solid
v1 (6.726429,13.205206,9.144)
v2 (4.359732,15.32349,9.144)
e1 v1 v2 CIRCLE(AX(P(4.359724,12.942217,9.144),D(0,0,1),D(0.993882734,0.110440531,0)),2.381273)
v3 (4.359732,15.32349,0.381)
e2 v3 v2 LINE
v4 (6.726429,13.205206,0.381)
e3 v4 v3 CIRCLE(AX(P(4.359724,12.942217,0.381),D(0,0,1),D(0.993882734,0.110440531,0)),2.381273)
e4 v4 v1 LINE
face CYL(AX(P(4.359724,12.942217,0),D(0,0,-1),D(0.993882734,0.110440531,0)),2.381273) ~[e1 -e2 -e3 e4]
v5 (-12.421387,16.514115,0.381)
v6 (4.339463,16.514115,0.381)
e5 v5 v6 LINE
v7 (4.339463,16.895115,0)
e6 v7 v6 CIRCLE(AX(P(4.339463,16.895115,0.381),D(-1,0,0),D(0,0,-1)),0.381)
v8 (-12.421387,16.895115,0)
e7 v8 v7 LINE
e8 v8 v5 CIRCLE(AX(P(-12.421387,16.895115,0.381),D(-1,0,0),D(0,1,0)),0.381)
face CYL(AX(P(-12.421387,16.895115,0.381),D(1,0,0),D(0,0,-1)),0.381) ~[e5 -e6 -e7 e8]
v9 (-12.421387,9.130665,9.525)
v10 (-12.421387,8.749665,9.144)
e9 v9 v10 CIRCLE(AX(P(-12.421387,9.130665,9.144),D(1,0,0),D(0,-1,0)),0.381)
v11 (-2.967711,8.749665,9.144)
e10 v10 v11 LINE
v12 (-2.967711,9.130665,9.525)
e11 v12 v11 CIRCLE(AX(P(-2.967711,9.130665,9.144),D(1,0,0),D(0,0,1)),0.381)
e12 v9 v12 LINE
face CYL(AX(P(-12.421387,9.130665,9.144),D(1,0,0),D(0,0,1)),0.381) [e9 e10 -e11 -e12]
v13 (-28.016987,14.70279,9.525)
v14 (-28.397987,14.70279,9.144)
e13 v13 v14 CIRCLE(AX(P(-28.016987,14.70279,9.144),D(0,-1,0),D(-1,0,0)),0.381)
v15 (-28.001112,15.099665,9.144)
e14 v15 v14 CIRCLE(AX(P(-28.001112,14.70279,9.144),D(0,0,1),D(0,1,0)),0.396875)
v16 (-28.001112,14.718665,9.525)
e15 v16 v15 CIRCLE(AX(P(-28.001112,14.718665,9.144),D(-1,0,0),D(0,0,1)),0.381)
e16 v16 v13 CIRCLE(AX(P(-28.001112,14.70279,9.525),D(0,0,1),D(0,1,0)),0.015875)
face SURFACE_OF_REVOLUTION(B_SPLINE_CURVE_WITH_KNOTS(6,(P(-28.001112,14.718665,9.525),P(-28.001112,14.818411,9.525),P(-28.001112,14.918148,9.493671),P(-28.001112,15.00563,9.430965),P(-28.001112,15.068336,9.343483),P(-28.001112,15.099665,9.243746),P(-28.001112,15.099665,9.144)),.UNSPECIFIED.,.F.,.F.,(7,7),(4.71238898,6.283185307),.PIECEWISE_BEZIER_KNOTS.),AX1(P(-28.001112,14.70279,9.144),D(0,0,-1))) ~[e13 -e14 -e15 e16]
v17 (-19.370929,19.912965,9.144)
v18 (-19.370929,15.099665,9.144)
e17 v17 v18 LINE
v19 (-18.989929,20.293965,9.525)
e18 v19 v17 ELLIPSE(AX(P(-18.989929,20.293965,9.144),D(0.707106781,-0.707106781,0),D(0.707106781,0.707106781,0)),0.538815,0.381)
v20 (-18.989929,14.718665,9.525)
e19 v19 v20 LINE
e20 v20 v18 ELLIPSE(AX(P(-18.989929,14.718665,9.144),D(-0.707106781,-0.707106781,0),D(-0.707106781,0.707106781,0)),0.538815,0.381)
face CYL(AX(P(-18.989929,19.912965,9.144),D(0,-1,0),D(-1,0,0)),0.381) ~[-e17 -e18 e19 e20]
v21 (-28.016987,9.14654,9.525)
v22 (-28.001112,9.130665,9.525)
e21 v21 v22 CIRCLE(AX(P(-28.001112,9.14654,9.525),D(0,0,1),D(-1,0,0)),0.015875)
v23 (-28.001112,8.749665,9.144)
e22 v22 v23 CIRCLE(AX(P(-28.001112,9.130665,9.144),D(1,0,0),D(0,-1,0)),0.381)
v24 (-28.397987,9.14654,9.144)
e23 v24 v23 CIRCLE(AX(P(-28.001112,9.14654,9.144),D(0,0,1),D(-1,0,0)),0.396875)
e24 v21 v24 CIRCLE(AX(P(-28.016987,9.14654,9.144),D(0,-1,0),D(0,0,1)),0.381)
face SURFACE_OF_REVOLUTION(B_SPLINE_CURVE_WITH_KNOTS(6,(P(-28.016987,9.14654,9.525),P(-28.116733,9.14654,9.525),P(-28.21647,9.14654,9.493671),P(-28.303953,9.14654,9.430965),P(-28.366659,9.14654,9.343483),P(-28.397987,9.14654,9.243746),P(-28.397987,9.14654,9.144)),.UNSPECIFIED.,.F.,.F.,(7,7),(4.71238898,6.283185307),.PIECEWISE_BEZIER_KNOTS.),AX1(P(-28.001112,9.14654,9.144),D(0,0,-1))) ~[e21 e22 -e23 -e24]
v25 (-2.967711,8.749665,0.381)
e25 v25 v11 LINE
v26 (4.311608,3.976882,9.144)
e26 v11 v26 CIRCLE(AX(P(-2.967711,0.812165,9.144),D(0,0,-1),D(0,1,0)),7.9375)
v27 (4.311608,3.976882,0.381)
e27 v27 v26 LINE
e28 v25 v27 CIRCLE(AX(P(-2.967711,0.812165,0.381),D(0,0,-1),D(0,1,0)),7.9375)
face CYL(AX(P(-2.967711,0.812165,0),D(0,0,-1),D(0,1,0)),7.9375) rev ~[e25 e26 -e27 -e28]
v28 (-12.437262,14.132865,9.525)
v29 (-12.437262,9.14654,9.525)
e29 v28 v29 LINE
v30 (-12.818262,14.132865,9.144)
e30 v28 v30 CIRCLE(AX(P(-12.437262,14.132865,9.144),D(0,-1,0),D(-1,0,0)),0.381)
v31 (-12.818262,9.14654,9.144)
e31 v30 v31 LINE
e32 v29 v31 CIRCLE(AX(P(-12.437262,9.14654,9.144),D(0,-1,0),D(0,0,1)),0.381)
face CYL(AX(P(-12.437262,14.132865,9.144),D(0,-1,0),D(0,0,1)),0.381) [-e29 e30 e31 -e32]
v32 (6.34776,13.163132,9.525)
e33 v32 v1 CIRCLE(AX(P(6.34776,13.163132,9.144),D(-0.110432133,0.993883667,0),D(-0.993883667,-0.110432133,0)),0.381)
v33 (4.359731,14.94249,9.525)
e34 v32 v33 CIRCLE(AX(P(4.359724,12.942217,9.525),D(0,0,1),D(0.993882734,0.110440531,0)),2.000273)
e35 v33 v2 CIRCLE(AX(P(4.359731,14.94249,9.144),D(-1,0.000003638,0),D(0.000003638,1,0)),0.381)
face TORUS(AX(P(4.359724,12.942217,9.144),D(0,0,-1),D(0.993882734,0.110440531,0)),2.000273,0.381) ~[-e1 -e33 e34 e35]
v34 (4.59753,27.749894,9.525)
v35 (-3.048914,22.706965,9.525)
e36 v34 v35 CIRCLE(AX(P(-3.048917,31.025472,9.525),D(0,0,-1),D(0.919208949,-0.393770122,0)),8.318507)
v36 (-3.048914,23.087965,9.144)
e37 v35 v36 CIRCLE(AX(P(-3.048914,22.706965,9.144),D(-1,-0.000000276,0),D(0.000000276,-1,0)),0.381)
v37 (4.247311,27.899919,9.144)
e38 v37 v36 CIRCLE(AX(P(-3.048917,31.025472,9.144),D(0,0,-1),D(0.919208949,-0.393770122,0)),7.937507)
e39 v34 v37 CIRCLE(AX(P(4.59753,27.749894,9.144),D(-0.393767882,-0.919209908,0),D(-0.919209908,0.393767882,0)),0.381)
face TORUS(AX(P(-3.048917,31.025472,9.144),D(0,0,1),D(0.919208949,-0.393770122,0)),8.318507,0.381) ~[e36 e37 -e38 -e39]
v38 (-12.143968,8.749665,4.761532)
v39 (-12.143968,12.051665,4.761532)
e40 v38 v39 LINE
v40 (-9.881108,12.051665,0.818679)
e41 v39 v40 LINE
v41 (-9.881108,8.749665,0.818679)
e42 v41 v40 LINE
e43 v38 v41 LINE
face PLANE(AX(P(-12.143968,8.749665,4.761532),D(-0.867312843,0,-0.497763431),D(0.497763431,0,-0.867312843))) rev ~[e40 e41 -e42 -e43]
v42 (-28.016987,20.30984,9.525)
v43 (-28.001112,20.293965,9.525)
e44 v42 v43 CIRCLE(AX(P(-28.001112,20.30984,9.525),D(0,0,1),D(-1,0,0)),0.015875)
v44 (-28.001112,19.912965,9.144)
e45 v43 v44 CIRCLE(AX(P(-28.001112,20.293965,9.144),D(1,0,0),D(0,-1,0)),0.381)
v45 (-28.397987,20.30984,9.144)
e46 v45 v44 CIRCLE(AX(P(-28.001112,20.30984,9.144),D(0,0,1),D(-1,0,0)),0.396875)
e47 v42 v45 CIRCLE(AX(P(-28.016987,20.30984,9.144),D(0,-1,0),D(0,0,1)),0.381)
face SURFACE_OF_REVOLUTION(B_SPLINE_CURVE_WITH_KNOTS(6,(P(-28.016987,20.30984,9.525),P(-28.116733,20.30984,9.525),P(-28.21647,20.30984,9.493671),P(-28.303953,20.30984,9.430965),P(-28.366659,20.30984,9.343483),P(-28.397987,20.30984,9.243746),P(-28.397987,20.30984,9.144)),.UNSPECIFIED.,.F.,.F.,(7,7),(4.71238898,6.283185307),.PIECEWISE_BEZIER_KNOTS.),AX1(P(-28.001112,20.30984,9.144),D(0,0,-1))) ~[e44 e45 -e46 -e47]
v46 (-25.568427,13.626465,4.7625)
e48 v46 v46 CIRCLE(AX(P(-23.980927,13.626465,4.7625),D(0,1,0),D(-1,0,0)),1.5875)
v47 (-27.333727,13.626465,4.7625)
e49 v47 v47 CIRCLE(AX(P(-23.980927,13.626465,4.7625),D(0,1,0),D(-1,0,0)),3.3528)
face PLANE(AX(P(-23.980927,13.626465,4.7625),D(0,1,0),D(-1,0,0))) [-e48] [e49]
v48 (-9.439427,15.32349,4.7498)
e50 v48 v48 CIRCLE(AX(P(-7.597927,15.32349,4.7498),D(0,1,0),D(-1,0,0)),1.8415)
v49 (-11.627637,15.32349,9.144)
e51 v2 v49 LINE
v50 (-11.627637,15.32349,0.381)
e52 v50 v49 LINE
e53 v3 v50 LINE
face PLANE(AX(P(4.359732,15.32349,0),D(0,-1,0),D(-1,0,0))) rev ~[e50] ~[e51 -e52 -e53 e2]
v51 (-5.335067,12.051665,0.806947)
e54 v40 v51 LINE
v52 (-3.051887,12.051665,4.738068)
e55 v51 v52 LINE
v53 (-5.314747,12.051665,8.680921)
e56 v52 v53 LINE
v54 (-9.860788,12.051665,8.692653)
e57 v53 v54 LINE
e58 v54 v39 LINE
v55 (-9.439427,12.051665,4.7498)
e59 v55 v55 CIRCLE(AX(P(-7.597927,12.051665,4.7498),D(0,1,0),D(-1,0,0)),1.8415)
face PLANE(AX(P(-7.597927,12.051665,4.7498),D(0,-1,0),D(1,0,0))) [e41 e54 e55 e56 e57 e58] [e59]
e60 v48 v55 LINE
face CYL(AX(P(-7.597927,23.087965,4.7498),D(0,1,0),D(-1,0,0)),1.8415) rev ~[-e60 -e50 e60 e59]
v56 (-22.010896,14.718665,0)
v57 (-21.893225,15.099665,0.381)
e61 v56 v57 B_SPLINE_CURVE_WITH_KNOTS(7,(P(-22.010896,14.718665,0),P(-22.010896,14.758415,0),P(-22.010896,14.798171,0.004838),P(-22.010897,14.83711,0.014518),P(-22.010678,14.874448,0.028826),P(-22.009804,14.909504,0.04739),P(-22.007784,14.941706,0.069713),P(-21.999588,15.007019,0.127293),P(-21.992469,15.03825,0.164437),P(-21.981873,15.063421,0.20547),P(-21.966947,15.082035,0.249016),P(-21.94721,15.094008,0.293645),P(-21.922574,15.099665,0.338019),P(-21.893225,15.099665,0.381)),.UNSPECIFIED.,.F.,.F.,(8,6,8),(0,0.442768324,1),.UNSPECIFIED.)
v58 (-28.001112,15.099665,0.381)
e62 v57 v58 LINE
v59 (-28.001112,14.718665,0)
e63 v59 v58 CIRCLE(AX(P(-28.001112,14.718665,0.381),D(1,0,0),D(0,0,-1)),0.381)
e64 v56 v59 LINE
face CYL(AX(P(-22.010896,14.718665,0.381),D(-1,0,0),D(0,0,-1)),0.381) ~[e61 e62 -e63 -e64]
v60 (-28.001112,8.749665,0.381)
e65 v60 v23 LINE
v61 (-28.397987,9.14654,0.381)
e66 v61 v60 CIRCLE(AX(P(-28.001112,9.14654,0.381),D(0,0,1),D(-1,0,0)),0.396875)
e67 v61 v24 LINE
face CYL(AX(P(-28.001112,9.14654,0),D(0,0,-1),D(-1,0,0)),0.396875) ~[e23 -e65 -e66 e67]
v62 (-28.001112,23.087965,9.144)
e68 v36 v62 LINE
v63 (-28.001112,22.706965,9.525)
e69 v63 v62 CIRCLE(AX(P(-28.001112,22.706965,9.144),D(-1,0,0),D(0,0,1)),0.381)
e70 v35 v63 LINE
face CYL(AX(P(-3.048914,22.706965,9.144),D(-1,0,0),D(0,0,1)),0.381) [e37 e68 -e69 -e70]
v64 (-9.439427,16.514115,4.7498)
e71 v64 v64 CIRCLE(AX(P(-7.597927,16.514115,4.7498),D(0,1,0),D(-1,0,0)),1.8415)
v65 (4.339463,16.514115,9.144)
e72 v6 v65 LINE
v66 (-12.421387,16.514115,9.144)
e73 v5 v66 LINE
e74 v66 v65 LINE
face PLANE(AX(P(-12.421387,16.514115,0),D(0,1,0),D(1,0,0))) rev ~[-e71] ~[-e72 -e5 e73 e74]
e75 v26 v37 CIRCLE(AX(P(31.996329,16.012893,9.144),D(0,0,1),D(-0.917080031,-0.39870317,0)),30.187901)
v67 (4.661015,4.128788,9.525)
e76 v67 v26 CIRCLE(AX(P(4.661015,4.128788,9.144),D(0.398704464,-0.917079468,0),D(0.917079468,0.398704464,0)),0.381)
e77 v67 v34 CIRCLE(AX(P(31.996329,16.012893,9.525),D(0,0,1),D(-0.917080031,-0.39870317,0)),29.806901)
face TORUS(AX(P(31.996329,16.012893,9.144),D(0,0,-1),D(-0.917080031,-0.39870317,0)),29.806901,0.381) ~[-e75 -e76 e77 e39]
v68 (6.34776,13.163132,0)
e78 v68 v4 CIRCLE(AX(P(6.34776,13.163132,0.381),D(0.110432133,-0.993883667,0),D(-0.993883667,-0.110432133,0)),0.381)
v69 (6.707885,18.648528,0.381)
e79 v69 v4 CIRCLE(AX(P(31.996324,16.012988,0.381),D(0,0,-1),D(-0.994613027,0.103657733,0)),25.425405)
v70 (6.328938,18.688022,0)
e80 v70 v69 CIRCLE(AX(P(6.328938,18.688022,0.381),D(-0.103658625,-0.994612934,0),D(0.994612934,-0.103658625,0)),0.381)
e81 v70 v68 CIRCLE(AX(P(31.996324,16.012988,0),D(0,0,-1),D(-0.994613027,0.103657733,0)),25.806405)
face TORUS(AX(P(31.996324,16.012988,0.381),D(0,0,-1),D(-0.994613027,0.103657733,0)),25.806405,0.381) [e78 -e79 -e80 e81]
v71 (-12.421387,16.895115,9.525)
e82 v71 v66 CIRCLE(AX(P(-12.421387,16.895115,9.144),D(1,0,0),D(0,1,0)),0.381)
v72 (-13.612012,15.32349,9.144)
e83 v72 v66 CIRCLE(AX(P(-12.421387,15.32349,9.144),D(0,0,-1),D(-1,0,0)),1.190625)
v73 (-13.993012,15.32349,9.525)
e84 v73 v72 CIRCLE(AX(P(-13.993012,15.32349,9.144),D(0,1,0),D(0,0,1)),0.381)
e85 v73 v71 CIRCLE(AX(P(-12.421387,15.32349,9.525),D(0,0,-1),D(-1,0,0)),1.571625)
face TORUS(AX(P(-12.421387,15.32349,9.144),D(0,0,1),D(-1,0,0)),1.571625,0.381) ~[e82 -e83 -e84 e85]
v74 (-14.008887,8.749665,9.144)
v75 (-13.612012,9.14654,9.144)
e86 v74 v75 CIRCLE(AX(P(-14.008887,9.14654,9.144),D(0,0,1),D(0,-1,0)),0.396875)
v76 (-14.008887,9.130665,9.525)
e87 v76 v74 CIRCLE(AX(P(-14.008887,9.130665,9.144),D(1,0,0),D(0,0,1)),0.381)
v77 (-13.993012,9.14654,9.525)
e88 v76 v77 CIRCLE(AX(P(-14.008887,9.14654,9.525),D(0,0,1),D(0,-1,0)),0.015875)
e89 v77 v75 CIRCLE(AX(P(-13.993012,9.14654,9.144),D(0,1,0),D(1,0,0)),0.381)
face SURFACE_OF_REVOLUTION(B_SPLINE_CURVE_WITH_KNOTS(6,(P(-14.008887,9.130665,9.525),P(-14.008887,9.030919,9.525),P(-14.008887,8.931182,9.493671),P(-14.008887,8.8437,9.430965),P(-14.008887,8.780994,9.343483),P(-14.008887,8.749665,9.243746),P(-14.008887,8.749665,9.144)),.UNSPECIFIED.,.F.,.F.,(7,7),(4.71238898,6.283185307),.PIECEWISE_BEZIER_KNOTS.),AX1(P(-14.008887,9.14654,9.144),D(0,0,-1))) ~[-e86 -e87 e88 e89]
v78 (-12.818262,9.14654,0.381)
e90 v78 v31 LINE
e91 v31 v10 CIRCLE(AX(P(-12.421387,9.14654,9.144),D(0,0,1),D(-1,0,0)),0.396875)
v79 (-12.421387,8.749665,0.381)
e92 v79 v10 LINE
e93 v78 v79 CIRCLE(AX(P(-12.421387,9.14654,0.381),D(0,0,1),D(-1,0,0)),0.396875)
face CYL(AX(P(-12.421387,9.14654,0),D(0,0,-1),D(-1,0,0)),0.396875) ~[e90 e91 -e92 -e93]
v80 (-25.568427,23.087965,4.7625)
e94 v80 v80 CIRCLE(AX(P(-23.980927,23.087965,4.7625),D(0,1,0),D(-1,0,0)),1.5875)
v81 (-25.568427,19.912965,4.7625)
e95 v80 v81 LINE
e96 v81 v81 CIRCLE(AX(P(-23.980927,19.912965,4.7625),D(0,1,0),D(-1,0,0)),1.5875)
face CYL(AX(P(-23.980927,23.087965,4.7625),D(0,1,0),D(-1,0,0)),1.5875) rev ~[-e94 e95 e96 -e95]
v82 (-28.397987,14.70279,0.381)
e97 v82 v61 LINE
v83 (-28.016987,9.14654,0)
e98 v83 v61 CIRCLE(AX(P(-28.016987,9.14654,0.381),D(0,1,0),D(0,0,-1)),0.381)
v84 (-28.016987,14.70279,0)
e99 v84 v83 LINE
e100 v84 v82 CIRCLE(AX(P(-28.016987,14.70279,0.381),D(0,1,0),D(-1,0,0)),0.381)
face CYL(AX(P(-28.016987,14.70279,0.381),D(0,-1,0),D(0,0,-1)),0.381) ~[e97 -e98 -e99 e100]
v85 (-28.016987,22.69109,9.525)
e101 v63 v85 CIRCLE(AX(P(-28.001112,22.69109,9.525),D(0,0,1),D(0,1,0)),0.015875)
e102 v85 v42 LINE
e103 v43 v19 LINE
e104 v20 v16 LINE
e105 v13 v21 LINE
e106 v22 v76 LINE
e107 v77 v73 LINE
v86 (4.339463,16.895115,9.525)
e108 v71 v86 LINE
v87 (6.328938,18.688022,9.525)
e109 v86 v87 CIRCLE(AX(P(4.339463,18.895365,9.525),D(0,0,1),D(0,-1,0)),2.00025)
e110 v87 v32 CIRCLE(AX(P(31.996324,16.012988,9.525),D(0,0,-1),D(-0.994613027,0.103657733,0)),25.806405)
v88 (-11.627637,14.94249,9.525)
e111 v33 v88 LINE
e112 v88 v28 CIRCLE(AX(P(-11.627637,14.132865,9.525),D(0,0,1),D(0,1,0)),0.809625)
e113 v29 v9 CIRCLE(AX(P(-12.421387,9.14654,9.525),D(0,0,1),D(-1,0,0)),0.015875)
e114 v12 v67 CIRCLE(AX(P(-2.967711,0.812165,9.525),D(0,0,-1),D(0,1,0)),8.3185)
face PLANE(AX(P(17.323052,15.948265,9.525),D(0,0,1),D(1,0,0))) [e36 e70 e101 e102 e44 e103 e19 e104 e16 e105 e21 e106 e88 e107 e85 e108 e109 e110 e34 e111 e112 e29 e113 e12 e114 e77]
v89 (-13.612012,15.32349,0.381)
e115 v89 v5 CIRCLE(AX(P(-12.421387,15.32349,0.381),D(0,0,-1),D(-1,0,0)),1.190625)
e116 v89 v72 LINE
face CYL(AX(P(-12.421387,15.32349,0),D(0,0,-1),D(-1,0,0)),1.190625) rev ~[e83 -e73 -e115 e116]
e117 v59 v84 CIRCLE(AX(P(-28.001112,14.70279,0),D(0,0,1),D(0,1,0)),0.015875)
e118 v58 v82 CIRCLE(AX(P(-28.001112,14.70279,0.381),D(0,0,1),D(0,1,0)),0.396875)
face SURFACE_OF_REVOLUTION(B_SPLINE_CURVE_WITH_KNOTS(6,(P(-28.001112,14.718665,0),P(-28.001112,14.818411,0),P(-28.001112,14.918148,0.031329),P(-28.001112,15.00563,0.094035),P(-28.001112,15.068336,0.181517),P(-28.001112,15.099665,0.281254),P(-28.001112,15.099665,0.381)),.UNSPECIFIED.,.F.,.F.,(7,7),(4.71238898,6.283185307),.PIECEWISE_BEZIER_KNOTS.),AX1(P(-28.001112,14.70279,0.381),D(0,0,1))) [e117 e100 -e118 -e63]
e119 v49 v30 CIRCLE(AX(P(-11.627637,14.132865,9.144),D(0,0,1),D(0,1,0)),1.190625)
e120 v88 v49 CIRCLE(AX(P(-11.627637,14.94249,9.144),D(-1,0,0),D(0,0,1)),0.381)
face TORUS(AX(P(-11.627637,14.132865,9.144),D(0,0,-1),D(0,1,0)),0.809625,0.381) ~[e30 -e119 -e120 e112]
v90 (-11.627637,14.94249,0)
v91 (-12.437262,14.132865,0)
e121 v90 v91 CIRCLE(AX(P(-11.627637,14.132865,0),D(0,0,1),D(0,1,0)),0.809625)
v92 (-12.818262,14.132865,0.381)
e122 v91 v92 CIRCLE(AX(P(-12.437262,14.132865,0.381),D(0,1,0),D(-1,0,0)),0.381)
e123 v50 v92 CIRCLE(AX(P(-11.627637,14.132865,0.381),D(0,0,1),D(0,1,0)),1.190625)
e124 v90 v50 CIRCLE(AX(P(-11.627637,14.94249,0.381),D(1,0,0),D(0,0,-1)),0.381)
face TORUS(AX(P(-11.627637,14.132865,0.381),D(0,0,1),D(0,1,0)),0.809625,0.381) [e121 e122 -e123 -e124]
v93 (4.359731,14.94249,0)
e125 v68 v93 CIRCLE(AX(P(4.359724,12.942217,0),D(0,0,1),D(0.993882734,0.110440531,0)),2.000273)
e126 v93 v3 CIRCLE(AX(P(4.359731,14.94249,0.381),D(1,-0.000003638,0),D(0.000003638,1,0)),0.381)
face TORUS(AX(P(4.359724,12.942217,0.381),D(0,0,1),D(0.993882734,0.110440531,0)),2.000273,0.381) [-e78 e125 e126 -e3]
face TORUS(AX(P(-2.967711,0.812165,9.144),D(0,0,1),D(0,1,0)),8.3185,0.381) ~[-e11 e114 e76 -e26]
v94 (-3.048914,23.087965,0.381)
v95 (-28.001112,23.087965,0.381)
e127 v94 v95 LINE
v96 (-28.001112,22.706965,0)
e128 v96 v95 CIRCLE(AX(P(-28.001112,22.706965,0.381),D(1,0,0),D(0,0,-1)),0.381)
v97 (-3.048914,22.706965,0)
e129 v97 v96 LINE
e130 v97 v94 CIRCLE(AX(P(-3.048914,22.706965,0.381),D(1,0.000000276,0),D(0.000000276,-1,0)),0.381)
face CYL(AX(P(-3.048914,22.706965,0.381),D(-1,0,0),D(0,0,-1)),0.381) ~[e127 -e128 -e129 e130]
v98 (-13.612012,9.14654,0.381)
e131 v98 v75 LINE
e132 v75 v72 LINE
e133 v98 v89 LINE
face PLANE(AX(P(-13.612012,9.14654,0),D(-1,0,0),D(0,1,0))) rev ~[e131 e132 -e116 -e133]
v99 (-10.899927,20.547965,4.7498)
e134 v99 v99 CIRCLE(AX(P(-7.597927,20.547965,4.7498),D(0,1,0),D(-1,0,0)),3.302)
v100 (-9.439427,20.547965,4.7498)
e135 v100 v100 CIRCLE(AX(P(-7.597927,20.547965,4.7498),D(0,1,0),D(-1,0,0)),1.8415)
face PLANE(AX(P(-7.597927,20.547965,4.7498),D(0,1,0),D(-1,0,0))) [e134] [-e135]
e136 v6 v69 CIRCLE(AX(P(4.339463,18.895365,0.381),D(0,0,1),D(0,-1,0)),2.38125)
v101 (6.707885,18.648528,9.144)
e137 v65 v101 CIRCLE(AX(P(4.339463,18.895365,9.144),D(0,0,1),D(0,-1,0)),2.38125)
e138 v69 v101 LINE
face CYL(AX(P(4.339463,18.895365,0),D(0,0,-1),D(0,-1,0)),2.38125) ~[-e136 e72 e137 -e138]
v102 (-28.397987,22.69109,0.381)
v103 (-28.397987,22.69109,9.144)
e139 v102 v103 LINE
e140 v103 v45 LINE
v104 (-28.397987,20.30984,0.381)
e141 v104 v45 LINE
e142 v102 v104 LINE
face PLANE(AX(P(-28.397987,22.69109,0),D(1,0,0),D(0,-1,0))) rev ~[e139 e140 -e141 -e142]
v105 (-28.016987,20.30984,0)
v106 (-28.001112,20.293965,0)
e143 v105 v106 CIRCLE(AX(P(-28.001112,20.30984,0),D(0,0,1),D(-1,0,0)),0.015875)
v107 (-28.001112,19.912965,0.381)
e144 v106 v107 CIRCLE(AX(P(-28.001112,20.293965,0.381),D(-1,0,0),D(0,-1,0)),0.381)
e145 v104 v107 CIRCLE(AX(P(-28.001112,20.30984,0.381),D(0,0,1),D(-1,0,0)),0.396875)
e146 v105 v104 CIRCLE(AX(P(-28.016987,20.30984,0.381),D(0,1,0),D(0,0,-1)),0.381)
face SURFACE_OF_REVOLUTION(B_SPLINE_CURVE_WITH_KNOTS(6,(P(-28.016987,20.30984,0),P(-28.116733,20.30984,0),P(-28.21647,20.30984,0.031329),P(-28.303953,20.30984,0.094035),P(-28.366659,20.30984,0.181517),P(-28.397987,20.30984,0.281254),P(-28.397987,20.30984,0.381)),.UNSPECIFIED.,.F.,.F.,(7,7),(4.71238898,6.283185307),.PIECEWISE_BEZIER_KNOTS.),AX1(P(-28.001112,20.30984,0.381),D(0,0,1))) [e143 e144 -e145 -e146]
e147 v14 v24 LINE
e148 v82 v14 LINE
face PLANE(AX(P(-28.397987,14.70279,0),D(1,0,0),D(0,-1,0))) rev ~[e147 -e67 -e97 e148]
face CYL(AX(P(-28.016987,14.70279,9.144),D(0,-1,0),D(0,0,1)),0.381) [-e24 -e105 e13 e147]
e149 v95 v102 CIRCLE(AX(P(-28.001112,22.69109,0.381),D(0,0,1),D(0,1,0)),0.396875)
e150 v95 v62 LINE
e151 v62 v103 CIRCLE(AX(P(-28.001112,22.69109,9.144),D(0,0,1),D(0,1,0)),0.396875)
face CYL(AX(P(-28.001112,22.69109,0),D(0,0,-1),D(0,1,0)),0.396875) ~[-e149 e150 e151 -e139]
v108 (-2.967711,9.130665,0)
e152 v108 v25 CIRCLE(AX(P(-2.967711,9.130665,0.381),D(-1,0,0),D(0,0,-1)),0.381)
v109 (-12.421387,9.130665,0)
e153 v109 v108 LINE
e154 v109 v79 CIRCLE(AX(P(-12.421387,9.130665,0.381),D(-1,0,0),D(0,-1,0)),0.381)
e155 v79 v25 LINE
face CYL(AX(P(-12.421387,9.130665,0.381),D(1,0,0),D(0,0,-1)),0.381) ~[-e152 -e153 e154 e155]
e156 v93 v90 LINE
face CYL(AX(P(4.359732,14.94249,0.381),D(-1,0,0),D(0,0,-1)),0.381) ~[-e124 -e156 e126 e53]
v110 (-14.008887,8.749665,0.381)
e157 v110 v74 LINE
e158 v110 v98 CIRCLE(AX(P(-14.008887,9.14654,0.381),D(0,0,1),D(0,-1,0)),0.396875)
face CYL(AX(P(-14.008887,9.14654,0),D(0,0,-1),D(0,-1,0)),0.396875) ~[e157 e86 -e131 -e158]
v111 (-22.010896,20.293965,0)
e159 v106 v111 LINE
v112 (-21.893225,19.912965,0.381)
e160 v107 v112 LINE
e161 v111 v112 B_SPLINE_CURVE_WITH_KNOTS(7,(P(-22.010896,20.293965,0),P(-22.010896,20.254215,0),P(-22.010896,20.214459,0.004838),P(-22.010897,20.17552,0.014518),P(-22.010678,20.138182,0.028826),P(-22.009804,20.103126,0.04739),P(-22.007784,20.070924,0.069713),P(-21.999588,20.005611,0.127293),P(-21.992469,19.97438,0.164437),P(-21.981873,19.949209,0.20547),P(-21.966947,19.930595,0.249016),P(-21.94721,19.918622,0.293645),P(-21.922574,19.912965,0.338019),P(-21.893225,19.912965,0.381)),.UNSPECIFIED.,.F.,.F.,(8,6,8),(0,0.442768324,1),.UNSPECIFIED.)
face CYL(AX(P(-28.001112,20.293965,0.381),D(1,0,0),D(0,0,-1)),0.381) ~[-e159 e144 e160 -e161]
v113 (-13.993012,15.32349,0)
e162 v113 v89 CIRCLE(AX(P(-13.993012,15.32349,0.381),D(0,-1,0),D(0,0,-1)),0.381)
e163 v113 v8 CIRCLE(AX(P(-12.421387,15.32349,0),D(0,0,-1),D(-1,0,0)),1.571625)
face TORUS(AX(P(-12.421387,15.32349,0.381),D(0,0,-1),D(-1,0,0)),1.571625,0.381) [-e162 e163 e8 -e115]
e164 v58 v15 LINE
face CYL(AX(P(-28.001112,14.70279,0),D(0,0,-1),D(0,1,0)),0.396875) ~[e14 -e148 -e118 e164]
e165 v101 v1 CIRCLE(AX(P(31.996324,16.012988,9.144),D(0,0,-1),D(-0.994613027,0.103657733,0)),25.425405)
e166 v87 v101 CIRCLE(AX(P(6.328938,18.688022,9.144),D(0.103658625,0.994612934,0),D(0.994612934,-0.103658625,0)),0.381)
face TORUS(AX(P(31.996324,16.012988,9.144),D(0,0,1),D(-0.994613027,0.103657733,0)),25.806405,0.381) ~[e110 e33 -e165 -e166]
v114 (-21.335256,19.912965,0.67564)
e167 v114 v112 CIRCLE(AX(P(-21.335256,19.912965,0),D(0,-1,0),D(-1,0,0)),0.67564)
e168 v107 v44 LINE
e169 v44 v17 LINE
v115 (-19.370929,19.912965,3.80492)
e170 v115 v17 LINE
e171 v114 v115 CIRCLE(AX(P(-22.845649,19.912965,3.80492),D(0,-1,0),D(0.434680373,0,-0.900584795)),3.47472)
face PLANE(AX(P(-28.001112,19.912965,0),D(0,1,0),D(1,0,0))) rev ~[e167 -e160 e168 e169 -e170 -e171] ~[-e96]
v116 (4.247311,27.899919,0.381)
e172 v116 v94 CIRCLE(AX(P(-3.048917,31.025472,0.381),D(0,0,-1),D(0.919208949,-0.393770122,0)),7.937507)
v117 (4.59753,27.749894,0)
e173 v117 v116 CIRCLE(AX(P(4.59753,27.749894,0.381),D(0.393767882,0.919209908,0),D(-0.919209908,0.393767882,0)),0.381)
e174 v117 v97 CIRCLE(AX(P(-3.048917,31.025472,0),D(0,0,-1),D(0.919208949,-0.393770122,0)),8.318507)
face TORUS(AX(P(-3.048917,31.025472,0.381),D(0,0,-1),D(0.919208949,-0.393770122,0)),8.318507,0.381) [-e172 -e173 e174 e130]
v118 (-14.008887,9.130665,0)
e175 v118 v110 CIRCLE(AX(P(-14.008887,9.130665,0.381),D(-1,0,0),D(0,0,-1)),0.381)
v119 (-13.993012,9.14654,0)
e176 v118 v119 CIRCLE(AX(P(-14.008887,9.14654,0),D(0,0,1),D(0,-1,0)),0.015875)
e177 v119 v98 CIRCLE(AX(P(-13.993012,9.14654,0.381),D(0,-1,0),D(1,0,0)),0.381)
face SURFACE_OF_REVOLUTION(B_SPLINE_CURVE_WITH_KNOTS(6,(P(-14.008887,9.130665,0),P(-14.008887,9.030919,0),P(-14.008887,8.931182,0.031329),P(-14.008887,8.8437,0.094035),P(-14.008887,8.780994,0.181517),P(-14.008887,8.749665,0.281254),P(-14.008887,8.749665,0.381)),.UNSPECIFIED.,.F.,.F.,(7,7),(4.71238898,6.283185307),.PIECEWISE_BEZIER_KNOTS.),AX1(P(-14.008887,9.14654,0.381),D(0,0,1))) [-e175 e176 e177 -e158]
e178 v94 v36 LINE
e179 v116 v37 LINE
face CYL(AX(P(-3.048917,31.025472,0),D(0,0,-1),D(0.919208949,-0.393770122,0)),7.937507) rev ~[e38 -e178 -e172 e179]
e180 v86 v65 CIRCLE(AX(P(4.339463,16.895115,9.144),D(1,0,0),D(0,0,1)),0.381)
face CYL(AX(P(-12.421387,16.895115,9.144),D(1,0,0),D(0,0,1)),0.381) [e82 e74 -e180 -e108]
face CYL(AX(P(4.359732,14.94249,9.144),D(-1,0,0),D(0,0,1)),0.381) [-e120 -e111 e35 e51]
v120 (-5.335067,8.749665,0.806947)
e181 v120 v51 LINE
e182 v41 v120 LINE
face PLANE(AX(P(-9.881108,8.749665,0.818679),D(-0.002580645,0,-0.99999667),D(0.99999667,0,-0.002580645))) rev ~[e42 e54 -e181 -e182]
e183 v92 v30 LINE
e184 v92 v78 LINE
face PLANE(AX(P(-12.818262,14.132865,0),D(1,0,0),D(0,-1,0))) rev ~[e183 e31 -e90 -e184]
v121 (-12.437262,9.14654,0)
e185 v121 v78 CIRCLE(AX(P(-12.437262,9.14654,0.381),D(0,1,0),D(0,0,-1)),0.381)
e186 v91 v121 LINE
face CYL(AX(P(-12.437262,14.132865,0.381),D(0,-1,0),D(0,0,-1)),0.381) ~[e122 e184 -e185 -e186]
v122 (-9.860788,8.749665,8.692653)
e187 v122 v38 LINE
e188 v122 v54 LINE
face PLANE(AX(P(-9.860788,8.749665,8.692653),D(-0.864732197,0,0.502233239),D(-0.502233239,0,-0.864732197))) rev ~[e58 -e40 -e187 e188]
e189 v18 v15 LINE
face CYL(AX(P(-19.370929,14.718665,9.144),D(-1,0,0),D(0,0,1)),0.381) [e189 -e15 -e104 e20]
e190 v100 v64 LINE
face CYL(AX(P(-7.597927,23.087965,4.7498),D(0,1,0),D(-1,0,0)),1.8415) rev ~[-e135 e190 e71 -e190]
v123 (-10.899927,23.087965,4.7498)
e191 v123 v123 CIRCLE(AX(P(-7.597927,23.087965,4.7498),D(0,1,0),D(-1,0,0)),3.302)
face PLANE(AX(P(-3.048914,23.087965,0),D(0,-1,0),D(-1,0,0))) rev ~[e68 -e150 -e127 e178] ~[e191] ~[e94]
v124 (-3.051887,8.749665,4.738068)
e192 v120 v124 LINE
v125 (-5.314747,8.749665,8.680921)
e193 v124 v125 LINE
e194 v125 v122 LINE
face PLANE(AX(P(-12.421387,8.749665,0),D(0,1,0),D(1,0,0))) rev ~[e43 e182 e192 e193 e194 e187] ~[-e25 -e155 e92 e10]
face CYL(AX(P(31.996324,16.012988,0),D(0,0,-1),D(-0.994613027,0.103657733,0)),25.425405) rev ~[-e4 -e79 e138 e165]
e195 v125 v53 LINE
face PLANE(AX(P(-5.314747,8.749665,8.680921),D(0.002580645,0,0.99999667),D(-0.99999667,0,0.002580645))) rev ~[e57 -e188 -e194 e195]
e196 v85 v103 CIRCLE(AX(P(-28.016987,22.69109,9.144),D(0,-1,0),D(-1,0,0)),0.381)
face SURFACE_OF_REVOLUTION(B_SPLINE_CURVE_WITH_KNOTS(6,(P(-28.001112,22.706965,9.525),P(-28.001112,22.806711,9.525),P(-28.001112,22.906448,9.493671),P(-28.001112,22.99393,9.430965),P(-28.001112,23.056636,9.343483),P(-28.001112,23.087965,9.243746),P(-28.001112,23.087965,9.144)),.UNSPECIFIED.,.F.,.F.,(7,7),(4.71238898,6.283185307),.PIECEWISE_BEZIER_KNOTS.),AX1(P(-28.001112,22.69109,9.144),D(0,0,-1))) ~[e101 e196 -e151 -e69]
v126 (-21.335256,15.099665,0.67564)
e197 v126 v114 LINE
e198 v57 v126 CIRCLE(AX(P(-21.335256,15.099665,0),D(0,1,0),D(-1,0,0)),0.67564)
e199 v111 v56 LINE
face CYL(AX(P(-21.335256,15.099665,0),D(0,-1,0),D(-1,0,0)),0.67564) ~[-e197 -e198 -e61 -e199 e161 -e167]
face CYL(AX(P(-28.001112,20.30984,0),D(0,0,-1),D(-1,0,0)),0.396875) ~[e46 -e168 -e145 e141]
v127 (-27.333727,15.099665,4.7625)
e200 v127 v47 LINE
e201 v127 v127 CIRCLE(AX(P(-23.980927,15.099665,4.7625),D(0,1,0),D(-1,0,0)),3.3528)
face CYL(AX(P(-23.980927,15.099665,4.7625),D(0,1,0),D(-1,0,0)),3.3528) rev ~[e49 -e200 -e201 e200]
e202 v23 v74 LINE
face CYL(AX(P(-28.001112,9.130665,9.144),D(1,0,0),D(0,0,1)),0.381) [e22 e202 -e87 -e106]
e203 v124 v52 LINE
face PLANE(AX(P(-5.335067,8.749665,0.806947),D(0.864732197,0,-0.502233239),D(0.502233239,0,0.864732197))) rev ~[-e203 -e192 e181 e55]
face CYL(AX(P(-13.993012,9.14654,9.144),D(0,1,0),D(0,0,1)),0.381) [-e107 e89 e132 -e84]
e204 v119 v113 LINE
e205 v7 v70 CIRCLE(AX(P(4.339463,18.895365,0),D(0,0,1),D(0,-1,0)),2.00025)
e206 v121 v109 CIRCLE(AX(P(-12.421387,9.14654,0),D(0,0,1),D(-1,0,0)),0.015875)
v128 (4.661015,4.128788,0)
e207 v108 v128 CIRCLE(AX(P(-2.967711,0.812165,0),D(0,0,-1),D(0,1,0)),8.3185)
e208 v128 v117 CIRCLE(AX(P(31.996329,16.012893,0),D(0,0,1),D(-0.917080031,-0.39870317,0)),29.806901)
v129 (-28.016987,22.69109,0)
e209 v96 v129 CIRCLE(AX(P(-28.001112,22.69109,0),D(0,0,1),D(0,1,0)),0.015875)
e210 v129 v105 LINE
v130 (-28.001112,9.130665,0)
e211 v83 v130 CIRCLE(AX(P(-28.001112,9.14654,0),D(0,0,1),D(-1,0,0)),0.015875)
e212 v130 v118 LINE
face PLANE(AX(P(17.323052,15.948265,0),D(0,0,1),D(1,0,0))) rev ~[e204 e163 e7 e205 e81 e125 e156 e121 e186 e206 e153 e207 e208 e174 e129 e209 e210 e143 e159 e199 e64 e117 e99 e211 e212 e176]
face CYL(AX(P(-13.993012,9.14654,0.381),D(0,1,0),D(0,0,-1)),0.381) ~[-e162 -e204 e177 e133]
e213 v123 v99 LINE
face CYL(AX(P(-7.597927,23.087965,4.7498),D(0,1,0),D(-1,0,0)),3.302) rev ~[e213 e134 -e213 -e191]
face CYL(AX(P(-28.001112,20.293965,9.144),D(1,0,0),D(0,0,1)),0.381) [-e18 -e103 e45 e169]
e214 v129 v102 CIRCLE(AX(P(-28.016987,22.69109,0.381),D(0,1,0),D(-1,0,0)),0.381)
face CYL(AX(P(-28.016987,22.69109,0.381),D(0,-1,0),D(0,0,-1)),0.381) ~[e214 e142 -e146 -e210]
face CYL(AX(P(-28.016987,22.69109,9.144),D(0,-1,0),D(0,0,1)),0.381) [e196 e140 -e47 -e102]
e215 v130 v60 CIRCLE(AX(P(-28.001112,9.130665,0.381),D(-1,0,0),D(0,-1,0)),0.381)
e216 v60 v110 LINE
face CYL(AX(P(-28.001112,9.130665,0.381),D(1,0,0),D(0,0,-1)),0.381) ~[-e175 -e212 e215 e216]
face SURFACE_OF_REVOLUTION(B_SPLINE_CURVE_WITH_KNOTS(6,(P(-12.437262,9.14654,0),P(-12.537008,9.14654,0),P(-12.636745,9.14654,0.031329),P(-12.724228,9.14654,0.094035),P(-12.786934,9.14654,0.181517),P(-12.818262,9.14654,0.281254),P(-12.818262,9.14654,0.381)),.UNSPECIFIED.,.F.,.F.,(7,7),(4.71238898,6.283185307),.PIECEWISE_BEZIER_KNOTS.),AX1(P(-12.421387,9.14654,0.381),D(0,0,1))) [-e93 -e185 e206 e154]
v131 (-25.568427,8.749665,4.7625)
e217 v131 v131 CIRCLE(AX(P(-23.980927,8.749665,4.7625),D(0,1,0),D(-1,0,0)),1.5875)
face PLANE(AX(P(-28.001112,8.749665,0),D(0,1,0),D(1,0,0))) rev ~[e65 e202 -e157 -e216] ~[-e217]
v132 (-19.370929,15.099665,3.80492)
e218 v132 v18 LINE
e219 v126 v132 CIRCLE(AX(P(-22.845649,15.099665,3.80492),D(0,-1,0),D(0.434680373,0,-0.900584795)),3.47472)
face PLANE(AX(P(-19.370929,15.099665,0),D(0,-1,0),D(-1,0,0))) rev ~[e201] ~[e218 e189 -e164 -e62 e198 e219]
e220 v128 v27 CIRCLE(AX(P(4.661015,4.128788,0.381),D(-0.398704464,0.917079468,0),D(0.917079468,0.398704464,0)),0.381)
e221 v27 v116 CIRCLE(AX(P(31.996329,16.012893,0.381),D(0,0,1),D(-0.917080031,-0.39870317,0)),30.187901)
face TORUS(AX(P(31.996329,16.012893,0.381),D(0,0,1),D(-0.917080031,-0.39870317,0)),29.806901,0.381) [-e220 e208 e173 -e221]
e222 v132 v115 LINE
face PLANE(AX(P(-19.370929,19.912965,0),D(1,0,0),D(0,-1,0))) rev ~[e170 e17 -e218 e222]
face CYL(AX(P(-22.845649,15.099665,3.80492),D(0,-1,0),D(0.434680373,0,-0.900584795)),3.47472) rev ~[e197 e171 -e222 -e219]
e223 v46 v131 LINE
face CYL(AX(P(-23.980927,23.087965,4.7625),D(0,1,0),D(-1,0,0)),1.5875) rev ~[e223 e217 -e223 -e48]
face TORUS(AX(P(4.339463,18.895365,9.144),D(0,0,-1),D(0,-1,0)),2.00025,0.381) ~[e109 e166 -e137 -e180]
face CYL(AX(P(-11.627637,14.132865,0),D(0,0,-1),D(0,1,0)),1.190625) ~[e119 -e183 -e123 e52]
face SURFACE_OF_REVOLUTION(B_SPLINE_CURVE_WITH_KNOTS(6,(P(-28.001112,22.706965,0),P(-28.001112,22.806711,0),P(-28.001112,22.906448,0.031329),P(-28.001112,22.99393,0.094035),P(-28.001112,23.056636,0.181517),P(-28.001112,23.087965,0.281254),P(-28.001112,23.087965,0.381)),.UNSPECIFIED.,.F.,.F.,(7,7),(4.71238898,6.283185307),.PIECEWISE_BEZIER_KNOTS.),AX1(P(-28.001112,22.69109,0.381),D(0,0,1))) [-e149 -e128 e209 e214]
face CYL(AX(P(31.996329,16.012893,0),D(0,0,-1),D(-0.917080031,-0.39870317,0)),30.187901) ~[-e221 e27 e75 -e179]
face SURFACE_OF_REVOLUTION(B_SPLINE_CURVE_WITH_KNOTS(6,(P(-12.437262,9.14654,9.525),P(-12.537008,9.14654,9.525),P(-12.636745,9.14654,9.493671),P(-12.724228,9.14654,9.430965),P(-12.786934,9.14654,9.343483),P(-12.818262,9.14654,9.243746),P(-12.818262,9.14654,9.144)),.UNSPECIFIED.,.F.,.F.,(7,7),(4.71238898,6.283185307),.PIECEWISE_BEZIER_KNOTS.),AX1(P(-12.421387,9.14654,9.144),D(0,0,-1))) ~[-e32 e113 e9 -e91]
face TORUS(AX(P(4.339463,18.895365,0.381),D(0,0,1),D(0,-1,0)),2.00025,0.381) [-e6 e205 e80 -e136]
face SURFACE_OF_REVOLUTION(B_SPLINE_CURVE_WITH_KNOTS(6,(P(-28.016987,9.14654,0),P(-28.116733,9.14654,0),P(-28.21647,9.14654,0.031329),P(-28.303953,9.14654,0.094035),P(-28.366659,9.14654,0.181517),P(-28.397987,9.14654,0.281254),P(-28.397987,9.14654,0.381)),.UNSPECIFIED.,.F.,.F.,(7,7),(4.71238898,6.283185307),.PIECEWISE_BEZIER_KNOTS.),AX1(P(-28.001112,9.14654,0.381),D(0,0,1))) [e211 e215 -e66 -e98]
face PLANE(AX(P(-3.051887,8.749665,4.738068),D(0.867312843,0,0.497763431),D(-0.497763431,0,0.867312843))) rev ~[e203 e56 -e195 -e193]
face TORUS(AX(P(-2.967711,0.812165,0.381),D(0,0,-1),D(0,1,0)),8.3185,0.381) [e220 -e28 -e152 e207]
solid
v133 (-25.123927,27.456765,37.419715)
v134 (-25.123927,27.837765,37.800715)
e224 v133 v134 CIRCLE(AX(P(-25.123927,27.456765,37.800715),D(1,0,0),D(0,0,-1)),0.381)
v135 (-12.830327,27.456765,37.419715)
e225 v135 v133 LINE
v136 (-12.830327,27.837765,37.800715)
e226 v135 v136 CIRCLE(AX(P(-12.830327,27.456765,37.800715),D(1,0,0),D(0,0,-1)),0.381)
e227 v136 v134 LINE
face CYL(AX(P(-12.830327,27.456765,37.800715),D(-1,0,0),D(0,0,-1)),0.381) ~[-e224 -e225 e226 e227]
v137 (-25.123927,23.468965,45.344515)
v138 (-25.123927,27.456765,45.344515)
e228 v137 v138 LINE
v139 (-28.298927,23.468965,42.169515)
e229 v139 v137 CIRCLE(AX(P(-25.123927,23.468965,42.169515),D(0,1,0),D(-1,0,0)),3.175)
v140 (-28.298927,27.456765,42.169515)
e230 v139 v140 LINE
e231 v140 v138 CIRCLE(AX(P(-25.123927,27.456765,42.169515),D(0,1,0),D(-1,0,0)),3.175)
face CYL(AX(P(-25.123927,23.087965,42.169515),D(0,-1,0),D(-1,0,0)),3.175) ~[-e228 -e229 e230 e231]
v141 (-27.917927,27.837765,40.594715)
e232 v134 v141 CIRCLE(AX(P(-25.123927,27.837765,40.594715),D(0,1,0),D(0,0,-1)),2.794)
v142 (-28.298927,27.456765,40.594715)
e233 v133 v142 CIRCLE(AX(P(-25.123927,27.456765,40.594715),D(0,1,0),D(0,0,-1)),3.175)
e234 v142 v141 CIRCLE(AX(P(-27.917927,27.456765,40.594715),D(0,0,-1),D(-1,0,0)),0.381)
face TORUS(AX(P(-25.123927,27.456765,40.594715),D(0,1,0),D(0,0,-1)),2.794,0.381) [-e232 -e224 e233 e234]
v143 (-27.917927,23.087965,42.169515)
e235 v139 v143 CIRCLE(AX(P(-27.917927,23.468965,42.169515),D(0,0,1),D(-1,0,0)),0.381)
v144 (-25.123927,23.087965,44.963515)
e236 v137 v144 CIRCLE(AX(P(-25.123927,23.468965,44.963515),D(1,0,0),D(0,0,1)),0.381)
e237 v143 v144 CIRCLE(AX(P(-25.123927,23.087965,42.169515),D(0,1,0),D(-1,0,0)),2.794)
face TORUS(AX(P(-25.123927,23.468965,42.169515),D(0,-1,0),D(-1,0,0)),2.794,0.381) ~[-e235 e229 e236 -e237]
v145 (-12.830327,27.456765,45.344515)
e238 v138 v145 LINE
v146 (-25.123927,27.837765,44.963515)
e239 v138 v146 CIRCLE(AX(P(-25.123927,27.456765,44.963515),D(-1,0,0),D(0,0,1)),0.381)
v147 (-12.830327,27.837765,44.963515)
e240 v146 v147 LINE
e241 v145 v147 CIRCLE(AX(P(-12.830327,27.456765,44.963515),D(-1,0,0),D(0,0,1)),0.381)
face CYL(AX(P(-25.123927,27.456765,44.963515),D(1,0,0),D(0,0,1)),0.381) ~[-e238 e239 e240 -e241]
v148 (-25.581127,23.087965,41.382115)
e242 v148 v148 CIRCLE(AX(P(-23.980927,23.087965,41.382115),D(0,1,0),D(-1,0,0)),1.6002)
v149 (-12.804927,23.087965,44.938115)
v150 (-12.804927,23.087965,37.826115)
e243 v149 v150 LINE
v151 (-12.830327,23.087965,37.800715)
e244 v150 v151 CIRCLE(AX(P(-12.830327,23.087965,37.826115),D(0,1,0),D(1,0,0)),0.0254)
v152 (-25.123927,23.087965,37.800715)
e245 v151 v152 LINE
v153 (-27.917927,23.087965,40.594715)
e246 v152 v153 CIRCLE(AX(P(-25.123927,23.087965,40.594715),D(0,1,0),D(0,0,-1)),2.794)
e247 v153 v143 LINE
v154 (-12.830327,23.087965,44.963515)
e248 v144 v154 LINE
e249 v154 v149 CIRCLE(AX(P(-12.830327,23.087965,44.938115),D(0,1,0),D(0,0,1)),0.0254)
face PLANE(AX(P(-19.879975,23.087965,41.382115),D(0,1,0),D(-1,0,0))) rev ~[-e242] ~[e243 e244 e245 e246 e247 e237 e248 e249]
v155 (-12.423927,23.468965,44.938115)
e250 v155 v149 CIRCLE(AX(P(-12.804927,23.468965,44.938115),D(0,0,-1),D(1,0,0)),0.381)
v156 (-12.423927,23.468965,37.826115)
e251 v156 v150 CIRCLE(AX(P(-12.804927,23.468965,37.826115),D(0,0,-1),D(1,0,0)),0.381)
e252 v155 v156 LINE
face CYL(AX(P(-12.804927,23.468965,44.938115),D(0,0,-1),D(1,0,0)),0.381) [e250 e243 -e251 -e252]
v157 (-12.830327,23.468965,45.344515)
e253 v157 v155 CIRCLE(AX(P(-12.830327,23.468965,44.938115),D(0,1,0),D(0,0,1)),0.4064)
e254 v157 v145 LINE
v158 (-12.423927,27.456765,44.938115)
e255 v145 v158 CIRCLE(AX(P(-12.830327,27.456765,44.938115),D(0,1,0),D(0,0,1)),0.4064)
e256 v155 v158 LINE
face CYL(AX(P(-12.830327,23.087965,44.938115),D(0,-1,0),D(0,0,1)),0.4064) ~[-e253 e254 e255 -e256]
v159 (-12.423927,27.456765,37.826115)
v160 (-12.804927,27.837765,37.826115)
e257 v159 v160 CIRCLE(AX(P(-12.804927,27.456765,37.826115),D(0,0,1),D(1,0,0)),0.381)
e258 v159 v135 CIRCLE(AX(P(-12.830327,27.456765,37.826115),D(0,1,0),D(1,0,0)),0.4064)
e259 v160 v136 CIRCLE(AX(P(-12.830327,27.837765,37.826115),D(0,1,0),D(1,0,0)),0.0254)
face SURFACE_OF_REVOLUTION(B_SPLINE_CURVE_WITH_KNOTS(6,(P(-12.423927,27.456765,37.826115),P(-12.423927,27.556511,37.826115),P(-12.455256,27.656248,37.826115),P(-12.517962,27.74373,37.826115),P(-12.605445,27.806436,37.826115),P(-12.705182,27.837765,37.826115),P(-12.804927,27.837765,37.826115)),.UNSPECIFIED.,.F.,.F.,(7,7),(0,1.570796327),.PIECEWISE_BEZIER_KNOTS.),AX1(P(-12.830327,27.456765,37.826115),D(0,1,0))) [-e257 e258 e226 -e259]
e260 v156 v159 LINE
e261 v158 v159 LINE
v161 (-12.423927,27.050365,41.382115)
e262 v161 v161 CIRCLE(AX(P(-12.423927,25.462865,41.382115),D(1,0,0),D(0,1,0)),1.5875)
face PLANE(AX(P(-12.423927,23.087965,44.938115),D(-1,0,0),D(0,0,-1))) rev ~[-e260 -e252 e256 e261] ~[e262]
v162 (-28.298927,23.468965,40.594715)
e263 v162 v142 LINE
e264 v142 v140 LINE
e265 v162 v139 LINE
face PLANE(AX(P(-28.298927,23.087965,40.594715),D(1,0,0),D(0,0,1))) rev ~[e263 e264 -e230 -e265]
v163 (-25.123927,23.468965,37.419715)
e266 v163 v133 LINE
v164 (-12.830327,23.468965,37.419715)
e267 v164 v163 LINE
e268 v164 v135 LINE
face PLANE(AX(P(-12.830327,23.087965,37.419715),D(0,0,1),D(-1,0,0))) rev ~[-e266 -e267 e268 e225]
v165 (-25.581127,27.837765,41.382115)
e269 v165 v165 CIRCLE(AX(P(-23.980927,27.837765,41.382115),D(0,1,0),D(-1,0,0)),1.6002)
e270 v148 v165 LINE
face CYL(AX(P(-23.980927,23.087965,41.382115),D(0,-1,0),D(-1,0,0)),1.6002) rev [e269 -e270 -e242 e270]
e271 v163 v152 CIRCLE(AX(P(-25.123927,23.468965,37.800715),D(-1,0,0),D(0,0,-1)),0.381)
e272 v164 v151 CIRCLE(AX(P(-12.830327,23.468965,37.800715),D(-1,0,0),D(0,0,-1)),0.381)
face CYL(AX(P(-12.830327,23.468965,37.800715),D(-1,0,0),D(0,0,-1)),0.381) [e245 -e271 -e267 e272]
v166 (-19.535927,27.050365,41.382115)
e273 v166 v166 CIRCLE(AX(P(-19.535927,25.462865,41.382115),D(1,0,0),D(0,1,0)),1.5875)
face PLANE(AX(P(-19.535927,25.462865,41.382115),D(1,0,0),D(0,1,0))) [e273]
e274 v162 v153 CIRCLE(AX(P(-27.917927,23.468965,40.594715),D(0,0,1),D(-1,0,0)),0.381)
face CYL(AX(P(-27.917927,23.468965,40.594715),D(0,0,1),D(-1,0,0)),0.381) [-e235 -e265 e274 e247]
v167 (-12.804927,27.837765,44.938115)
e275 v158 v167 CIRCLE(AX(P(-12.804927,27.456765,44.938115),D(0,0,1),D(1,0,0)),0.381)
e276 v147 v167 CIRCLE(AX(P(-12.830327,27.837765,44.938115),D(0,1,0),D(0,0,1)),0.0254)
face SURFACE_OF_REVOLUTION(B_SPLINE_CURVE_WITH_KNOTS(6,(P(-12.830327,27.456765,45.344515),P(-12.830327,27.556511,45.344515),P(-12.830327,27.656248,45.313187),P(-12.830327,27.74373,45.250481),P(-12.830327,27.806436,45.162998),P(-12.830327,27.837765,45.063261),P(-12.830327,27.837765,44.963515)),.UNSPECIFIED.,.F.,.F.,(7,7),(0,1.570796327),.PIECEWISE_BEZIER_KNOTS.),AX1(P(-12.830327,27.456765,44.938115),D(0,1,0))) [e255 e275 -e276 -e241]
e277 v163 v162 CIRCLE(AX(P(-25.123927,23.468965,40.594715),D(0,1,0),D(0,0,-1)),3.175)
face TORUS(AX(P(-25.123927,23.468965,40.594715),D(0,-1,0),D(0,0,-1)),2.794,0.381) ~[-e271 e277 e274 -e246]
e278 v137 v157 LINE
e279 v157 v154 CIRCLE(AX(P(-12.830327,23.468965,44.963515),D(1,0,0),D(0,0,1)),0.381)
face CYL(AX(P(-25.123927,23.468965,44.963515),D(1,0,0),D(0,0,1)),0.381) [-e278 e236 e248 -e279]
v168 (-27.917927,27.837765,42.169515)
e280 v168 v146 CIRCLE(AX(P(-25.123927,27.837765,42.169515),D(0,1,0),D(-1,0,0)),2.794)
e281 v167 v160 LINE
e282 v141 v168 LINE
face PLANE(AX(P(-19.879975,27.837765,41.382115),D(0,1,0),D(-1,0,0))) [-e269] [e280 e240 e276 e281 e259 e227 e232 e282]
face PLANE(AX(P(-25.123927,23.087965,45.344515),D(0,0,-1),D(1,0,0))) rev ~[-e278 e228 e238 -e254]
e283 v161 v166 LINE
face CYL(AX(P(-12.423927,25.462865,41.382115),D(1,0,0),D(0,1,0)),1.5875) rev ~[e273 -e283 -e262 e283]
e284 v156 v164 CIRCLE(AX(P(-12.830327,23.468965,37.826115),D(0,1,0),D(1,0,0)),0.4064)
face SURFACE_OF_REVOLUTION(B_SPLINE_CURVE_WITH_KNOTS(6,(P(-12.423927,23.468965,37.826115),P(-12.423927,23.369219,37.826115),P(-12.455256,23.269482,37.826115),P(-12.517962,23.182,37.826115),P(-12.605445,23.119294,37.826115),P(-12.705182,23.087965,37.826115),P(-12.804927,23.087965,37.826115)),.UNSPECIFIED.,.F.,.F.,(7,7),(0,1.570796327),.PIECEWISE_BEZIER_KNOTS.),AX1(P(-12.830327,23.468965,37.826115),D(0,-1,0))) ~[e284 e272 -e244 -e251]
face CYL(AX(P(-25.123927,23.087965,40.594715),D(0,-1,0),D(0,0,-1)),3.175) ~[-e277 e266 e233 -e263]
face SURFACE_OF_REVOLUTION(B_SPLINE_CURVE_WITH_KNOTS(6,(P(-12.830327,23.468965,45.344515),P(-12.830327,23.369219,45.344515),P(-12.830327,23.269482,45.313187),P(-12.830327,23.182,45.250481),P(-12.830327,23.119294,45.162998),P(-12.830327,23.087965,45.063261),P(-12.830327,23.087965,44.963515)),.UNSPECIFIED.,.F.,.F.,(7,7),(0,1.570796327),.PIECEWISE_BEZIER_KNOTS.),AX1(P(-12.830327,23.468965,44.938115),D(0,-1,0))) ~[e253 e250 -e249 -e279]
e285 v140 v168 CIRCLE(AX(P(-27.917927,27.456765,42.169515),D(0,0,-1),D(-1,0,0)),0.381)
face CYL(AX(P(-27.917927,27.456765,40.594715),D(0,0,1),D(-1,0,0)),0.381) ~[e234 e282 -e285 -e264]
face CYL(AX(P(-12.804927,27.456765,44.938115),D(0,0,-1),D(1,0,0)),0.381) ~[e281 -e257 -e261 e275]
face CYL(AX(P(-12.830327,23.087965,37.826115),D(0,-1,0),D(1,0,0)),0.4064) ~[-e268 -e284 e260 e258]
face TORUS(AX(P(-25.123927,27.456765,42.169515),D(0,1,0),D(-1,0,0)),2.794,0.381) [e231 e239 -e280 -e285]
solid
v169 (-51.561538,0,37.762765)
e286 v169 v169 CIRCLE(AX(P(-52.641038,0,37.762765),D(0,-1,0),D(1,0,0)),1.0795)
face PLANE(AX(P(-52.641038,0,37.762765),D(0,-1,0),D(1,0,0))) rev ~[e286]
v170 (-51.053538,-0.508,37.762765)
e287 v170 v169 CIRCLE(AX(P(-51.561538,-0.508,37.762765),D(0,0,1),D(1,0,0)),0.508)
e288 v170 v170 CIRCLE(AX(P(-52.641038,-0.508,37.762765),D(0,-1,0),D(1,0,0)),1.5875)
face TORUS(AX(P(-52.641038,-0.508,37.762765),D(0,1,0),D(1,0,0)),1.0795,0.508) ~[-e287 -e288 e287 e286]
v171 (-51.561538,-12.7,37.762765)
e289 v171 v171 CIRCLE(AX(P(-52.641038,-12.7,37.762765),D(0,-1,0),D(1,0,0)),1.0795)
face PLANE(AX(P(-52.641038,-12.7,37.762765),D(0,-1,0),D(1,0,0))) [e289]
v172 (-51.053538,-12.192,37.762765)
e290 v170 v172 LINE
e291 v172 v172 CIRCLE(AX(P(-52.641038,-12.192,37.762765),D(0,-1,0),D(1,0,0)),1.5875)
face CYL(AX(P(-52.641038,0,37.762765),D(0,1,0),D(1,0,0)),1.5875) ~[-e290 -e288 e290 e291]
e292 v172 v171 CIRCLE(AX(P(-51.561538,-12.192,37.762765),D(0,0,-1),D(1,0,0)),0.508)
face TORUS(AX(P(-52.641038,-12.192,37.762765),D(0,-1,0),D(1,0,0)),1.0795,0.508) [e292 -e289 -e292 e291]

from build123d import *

# Parameters (mm, degrees)
F1_DEPTH      = 9.525
F4_DEPTH      = 4.8768
F2_R          = 1.5875
F5_DEPTH      = 16.2052
F5_DEPTH_BACK = 25.4
F8_R          = 0.381
F2_R_2        = 1.6002
F9_DEPTH      = 4.7498
F10_R         = 0.381
F11_R         = 1.5875
F12_DEPTH     = 7.112
F13_R         = 1.5875
F14_DEPTH     = 12.7
F15_R         = 0.508
F6_R          = 1.8415
F16_DEPTH     = 25.4
F6_R_2        = 3.302
F17_DEPTH     = 2.54
F18_DEPTH     = 3.302
F19_R         = 3.3528
F19_R_2       = 1.5875
F20_DEPTH     = 1.4732


# Not quite as in the source:
# - ends of sketch curves that miss each other by under 0.0002 mm in the source are joined
# - a feature names something its author has since deleted; it is built from what else it names


with BuildPart() as f1:
    # F0 (on Top) → F1 (new body)
    with BuildSketch(Plane.XY):
        with BuildLine():
            ThreePointArc((-28.3979874, 20.30984), (-28.2817454038, 20.0292069962), (-28.0011124, 19.912965))
            Line((-28.0011124, 19.912965), (-19.370929, 19.912965))
            Line((-19.370929, 19.912965), (-19.370929, 15.099665))
            Line((-19.370929, 15.099665), (-28.0011124, 15.099665))
            ThreePointArc((-28.0011124, 15.099665), (-28.2817454038, 14.9834230038), (-28.3979874, 14.70279))
            Line((-28.3979874, 14.70279), (-28.3979874, 9.14654))
            ThreePointArc((-28.3979874, 9.14654), (-28.2817454038, 8.8659069962), (-28.0011124, 8.749665))
            Line((-28.0011124, 8.749665), (-14.0088874, 8.749665))
            ThreePointArc((-14.0088874, 8.749665), (-13.7282543962, 8.8659069962), (-13.6120124, 9.14654))
            Line((-13.6120124, 9.14654), (-13.6120124, 15.3234898))
            ThreePointArc((-13.6120124, 15.3234898), (-13.2632864114, 16.1653888113), (-12.4213874, 16.5141148))
            Line((-12.4213874, 16.5141148), (4.339463, 16.5141148))
            ThreePointArc((4.339463, 16.5141148), (5.9336039467, 17.1264481246), (6.7078850502, 18.648527699))
            ThreePointArc((6.7078850502, 18.648527699), (57.4215819635, 16.0994244683), (6.7264293291, 13.2052061477))
            ThreePointArc((6.7264293291, 13.2052061477), (5.9478389323, 14.7165758926), (4.3597322, 15.3234898))
            Line((4.3597322, 15.3234898), (-11.6276374, 15.3234898))
            ThreePointArc((-11.6276374, 15.3234898), (-12.4695364114, 14.9747638113), (-12.8182624, 14.1328648))
            Line((-12.8182624, 14.1328648), (-12.8182624, 9.14654))
            ThreePointArc((-12.8182624, 9.14654), (-12.7020204038, 8.8659069962), (-12.4213874, 8.749665))
            Line((-12.4213874, 8.749665), (-2.9677106, 8.749665))
            ThreePointArc((-2.9677106, 8.749665), (1.384528339, 7.4500805213), (4.3116076755, 3.9768816847))
            ThreePointArc((4.3116076755, 3.9768816847), (62.1841201628, 16.0940335016), (4.2473111459, 27.8999190802))
            ThreePointArc((4.2473111459, 27.8999190802), (1.3211481307, 24.399270034), (-3.0489144, 23.087965))
            Line((-3.0489144, 23.087965), (-28.0011124, 23.087965))
            ThreePointArc((-28.0011124, 23.087965), (-28.2817454038, 22.9717230038), (-28.3979874, 22.69109))
            Line((-28.3979874, 22.69109), (-28.3979874, 20.30984))
        make_face()
    extrude(amount=F1_DEPTH)

    # F3 (on face) → F4 (join)
    with BuildSketch(Plane(origin=(0, 15.099665, 0), x_dir=(-1, 0, 0), z_dir=(0, 1, 0))):
        with BuildLine():
            ThreePointArc((21.3352564153, 0.67564), (19.9027023134, 1.9575586715), (19.370929, 3.80492))
            Line((19.370929, 3.80492), (19.370929, 0))
            Line((19.370929, 0), (22.0108964153, 0))
            ThreePointArc((22.0108964153, 0), (21.8130060409, 0.4777496256), (21.3352564153, 0.67564))
        make_face()
    extrude(amount=F4_DEPTH)

    # F2 (on face) → F5 (cut, two sides)
    with BuildSketch(Plane(origin=(0, 23.087965, 0), x_dir=(-1, 0, 0), z_dir=(0, 1, 0))) as f5_sk:
        with Locations((23.9809274, 4.7625)):
            Circle(F2_R)
    extrude(amount=-F5_DEPTH, mode=Mode.SUBTRACT)
    extrude(f5_sk.sketch, amount=F5_DEPTH_BACK, mode=Mode.SUBTRACT)

    # F8
    f8_edges = [f1.edges().sort_by_distance(p)[0] for p in [
        (1.384528, 7.450081, 0),
        (1.384528, 7.450081, 9.525),
        (-19.370929, 17.506315, 9.525),
    ]]
    fillet(f8_edges, radius=F8_R)

    # F6 (on face) → F16 (cut)
    with BuildSketch(Plane(origin=(0, 23.087965, 0), x_dir=(-1, 0, 0), z_dir=(0, 1, 0))):
        with Locations((7.5979274, 4.7498)):
            Circle(F6_R)
    extrude(amount=-F16_DEPTH, mode=Mode.SUBTRACT)

    # F6 (on face) → F17 (cut)
    with BuildSketch(Plane(origin=(0, 23.087965, 0), x_dir=(-1, 0, 0), z_dir=(0, 1, 0))):
        with Locations((7.5979274, 4.7498)):
            Circle(F6_R_2)
        with Locations((7.5979274, 4.7498)):
            Circle(F6_R, mode=Mode.SUBTRACT)
    extrude(amount=-F17_DEPTH, mode=Mode.SUBTRACT)

    # F7 (on face) → F18 (cut)
    with BuildSketch(Plane.XZ.offset(-8.749665)):
        Polygon((-9.8811078409, 0.8186789884), (-5.3350669591, 0.806947231), (-3.0518865182, 4.7380682425), (-5.3147469591, 8.6809210116), (-9.8607878409, 8.692652769), (-12.1439682818, 4.7615317575), align=None)
    extrude(amount=-F18_DEPTH, mode=Mode.SUBTRACT)

    # F19 (on face) → F20 (cut)
    with BuildSketch(Plane(origin=(0, 15.099665, 0), x_dir=(-1, 0, 0), z_dir=(0, 1, 0))):
        with Locations((23.9809274, 4.7625)):
            Circle(F19_R)
        with Locations((23.9809274, 4.7625)):
            Circle(F19_R_2, mode=Mode.SUBTRACT)
    extrude(amount=-F20_DEPTH, mode=Mode.SUBTRACT)


with BuildPart() as f9:
    # F2 (on face) → F9 (new body)
    with BuildSketch(Plane(origin=(0, 23.087965, 0), x_dir=(-1, 0, 0), z_dir=(0, 1, 0))):
        with BuildLine():
            Line((25.1239274, 45.3445153343), (12.8303274, 45.3445153343))
            ThreePointArc((12.8303274, 45.3445153343), (12.5429592041, 45.2254835301), (12.4239274, 44.9381153343))
            Line((12.4239274, 44.9381153343), (12.4239274, 37.8261153343))
            ThreePointArc((12.4239274, 37.8261153343), (12.5429592041, 37.5387471384), (12.8303274, 37.4197153343))
            Line((12.8303274, 37.4197153343), (25.1239274, 37.4197153343))
            ThreePointArc((25.1239274, 37.4197153343), (27.3689914303, 38.349651304), (28.2989274, 40.5947153343))
            Line((28.2989274, 40.5947153343), (28.2989274, 42.1695153343))
            ThreePointArc((28.2989274, 42.1695153343), (27.3689914303, 44.4145793645), (25.1239274, 45.3445153343))
        make_face()
        with Locations((23.9809274, 41.3821153343)):
            Circle(F2_R_2, mode=Mode.SUBTRACT)
    extrude(amount=F9_DEPTH)

    # F10
    f10_edges = [f9.edges().sort_by_distance(p)[0] for p in [
        (-18.977127, 27.837765, 37.419715),
        (-18.977127, 23.087965, 37.419715),
        (-12.423927, 25.462865, 44.938115),
        (-12.423927, 25.462865, 37.826115),
        (-12.423927, 23.087965, 41.382115),
        (-12.423927, 27.837765, 41.382115),
    ]]
    fillet(f10_edges, radius=F10_R)

    # F11 (on face) → F12 (cut)
    with BuildSketch(Plane.YZ.offset(-12.4239274)):
        with Locations((25.462865, 41.3821153343)):
            Circle(F11_R)
    extrude(amount=-F12_DEPTH, mode=Mode.SUBTRACT)


with BuildPart() as f14:
    # F13 (on Front) → F14 (new body)
    with BuildSketch(Plane.XZ):
        with Locations((-52.6410378516, 37.7627648413)):
            Circle(F13_R)
    extrude(amount=F14_DEPTH)

    # F15
    f15_edges = [f14.edges().sort_by_distance(p)[0] for p in [
        (-54.228538, 0, 37.762765),
        (-54.228538, -12.7, 37.762765),
    ]]
    fillet(f15_edges, radius=F15_R)


solid = Compound([f1.part, f9.part, f14.part])
